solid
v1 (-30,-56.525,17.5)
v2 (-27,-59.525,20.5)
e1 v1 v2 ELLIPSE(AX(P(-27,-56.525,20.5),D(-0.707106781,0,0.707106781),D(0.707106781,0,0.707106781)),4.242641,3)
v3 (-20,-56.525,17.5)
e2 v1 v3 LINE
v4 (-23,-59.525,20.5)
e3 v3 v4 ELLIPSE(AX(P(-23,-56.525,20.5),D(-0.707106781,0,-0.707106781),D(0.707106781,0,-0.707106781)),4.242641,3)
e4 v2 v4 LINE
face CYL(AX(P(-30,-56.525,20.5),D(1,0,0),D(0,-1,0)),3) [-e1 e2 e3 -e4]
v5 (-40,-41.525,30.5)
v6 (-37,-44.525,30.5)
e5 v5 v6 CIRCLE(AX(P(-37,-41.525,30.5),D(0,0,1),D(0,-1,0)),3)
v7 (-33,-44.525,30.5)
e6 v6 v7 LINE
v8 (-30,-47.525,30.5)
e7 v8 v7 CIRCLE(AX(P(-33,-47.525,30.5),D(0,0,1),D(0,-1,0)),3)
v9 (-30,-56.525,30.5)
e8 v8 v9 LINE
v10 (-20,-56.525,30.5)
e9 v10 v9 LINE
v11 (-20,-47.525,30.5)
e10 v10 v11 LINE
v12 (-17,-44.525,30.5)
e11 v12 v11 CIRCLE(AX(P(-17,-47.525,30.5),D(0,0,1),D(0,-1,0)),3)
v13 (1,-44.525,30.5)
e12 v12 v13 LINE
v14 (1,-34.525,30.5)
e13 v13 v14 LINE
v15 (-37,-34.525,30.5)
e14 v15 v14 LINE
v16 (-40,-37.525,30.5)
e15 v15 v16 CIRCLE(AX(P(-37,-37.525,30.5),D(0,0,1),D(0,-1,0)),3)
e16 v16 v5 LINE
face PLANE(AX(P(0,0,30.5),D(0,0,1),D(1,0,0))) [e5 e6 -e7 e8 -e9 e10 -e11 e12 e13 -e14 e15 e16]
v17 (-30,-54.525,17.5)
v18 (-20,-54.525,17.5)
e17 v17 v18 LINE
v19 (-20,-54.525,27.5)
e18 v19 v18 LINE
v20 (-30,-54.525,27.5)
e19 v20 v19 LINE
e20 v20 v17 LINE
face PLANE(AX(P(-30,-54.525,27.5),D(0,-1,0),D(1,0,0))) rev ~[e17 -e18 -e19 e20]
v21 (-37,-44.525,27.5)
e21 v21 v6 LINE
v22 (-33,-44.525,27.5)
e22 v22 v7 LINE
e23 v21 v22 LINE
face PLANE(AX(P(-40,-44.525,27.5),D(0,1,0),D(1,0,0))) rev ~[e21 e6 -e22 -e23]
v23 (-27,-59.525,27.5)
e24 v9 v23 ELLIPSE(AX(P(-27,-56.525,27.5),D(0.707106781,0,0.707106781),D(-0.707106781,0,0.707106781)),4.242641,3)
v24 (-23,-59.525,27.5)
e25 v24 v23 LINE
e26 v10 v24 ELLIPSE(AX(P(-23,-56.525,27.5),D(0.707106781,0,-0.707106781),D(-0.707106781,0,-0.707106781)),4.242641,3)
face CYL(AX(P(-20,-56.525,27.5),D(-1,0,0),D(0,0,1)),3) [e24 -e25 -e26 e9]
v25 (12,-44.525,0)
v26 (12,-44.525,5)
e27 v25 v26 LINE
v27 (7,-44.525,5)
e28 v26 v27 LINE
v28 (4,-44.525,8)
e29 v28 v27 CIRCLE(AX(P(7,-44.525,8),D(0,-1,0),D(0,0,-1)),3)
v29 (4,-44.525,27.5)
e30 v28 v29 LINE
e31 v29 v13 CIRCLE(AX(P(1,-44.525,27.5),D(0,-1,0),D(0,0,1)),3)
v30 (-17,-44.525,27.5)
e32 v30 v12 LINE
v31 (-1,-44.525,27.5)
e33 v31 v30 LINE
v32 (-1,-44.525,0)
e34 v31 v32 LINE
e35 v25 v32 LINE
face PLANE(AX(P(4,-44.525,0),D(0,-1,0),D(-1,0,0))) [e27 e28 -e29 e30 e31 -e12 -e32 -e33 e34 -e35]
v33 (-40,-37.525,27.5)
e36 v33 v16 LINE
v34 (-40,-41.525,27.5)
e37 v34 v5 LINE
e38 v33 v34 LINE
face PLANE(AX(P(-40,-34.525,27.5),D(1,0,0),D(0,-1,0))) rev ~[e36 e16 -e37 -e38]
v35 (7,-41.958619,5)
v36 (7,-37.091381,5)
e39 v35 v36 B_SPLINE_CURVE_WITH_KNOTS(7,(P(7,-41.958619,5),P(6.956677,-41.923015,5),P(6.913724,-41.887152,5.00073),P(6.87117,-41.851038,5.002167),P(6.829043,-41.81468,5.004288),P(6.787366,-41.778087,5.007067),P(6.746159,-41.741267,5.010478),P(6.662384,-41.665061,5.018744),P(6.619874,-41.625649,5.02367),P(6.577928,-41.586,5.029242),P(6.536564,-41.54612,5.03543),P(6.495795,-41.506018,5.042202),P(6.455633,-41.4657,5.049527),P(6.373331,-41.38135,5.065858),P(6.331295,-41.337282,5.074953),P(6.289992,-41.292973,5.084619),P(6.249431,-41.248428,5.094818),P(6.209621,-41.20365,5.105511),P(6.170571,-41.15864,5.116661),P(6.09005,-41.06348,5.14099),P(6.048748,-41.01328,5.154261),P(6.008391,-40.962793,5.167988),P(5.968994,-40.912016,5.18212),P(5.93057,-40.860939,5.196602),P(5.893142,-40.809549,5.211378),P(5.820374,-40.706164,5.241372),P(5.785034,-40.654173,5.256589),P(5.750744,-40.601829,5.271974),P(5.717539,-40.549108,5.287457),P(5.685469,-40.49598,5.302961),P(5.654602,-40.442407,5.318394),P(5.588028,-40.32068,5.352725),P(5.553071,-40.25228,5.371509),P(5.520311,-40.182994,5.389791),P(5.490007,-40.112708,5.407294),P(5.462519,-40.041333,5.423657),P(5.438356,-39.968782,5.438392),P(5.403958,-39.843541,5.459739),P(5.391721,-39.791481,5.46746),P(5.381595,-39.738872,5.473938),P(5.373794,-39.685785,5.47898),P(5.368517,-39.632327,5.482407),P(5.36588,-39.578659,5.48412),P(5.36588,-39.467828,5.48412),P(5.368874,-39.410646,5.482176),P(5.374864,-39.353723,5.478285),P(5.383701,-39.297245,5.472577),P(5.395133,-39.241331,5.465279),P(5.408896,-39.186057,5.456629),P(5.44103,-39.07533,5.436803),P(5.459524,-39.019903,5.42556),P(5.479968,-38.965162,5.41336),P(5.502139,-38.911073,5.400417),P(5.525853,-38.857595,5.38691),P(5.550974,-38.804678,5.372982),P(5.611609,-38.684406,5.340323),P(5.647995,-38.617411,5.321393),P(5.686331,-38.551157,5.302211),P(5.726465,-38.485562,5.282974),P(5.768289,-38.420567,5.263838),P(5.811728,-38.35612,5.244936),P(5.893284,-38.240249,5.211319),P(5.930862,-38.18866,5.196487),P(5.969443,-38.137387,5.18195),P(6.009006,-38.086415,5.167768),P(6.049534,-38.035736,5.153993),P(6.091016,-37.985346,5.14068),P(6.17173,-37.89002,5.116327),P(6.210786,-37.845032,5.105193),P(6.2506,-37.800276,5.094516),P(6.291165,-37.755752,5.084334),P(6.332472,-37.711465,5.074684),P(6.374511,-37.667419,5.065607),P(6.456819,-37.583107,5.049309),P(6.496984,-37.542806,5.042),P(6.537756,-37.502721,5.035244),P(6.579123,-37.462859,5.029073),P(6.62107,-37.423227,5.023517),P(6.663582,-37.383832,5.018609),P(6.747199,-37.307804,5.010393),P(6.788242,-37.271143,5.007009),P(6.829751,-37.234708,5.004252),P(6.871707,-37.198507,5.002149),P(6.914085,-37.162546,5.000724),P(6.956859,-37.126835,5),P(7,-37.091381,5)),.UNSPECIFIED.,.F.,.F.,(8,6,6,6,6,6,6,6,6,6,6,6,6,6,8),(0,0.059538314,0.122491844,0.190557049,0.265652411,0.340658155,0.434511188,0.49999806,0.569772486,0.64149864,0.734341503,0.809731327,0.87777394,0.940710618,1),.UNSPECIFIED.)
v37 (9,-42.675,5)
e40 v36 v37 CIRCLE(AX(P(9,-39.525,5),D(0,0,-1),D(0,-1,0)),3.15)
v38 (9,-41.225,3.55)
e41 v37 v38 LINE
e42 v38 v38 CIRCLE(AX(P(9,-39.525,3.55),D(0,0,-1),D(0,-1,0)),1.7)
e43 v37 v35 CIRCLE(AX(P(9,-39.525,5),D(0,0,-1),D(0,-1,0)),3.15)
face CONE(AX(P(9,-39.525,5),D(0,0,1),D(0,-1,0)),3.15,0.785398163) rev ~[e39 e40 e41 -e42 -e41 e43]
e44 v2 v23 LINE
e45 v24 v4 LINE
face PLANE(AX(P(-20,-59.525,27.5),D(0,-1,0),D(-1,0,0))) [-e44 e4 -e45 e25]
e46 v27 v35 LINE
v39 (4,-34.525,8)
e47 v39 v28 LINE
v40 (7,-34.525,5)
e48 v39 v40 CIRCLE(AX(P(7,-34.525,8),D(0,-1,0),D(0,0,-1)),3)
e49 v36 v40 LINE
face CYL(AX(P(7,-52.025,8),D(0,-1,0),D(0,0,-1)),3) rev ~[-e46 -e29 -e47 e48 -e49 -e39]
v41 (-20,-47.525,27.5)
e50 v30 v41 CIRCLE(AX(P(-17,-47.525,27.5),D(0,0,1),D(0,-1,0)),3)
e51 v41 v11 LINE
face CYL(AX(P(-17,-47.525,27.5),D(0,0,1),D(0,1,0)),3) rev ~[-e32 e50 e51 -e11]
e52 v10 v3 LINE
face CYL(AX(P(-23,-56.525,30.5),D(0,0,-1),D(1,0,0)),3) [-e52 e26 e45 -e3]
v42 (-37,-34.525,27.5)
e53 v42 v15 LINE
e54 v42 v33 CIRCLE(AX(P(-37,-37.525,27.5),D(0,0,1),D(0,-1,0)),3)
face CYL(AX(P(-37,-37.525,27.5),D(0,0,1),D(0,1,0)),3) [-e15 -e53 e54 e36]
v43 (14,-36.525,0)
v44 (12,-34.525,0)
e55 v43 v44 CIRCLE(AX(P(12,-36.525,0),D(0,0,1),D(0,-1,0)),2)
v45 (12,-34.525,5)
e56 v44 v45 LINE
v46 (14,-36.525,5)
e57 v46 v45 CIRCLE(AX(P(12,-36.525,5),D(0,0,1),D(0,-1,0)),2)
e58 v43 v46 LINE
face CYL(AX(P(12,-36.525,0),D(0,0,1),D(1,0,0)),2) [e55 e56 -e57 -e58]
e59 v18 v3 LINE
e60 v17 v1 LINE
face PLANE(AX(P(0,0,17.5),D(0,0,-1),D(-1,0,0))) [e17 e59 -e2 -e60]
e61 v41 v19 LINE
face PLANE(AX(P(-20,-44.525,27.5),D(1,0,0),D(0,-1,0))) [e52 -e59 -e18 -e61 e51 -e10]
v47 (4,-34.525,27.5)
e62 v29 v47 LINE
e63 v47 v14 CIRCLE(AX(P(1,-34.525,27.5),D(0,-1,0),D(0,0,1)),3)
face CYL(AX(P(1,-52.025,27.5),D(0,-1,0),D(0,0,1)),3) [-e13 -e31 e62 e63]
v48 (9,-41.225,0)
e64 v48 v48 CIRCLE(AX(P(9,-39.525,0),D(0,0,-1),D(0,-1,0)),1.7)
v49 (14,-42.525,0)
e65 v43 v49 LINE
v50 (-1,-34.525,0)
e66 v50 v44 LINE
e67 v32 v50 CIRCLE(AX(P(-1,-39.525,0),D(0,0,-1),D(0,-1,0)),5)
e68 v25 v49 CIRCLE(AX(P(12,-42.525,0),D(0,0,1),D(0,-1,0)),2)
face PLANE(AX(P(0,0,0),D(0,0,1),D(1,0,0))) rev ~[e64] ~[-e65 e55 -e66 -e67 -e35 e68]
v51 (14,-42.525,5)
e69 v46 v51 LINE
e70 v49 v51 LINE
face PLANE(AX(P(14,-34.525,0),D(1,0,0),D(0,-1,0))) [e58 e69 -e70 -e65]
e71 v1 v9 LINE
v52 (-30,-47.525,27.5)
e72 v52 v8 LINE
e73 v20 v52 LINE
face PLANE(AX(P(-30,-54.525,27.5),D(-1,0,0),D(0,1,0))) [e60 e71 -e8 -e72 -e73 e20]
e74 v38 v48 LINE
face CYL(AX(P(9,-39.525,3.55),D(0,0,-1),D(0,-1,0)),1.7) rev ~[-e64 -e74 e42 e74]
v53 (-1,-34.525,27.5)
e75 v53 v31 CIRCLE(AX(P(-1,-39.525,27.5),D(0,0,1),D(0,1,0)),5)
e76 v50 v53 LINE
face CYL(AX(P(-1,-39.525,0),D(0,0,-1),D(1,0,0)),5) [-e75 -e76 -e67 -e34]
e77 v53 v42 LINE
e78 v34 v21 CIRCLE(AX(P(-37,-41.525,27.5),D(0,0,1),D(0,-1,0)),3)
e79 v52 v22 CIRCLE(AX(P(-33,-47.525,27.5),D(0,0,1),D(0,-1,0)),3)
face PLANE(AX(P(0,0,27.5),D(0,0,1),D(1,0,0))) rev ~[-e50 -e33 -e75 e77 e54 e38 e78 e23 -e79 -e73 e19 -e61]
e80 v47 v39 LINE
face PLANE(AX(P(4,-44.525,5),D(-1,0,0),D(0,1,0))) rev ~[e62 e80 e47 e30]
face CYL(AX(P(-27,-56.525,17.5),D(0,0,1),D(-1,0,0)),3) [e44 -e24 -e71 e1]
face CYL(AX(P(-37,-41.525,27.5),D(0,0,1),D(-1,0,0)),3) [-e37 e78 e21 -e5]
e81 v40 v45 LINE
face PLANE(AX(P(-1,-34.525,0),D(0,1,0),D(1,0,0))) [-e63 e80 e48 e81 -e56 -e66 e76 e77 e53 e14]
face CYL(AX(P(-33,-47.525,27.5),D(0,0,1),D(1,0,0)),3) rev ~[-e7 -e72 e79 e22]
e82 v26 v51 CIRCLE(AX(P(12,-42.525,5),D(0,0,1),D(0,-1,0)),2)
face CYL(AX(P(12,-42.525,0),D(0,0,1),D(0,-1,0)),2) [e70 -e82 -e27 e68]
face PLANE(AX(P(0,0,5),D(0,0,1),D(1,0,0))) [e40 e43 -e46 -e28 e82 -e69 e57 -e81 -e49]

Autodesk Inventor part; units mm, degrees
ref_plane "YZ Plane" through (0, 0, 0) normal (1, 0, 0) x (0, 1, 0)
ref_plane "XZ Plane" through (0, 0, 0) normal (0, 1, 0) x (-1, 0, 0)
ref_plane "РабПлоскость1" through (0, 0, 0) normal (0, 0, 1) x (1, 0, 0)
sketch "Эскиз1" plane through (0, 0, 0) normal (0, 0, 1) x (1, 0, 0)
  line L0 (-6, -50.525) -> (-6, 46.475) projected
  arc A0 (-10, -54.525) -> (-6, -50.525) centre (-10, -50.525) ccw projected
  line L1 (-36, -54.525) -> (-10, -54.525) projected
  arc A1 (-40, -50.525) -> (-36, -54.525) centre (-36, -50.525) ccw projected
  line L2 (-40, 46.475) -> (-40, -50.525) projected
  circle A2 centre (-1, -39.525) radius 5
  line L3 (5, 13.475) -> (5, 17.5589) projected
  line L4 (14, -44.525) -> (4, -44.525)
  line L5 (4, -44.525) -> (4, -34.525)
  line L6 (4, -34.525) -> (14, -34.525)
  line L7 (14, -34.525) -> (14, -44.525)
  line L8 (4, -44.525) -> (-1, -44.525)
  line L9 (-1, -44.525) -> (-1, -34.525)
  line L10 (-1, -34.525) -> (4, -34.525)
  line L11 (4, -34.525) -> (4, -44.525)
  point P0 (0, 0)
  dimension "d0" = 10
  dimension "d1" = 10
  dimension "d2" = 5
  dimension "d3" = 10
  dimension "d4" = 15
  dimension "d5" = 20
extrude "Выдавливание1" add sketch "Эскиз1" along normal blind 5
sketch "Эскиз2" plane through (0, 0, 5) normal (0, 0, 1) x (1, 0, 0)
  line L0 (-1, -44.525) -> (14, -44.525) projected
  line L1 (14, -44.525) -> (14, -34.525) projected
  line L2 (14, -34.525) -> (-1, -34.525) projected
  arc A0 (-1, -34.525) -> (-1, -44.525) centre (-1, -39.525) ccw projected
  circle A1 centre (-1, -39.525) radius 5
  line L3 (-1, -44.525) -> (4, -44.525)
  line L4 (4, -44.525) -> (4, -34.525)
  line L5 (4, -34.525) -> (-1, -34.525)
  line L6 (-1, -34.525) -> (-1, -44.525)
  point P0 (0, 0)
  point P1 (4, -44.525)
  dimension "d8" = 10
extrude "Выдавливание2" add sketch "Эскиз2" along normal blind 22.5 contours A1 L4 L0 | L6 A1 | A0 L6 | L2 L4 A1
sketch "Эскиз3" plane through (0, 0, 27.5) normal (0, 0, 1) x (1, 0, 0)
  line L0 (-1, -44.525) -> (4, -44.525) projected
  line L1 (4, -44.525) -> (4, -34.525) projected
  line L2 (4, -34.525) -> (-1, -34.525) projected
  arc A0 (-1, -34.525) -> (-1, -44.525) centre (-1, -39.525) ccw projected
  line L3 (4, -34.525) -> (-40, -34.525)
  line L4 (-40, -34.525) -> (-40, -44.525)
  line L5 (-40, -44.525) -> (4, -44.525)
  line L6 (4, -44.525) -> (4, -34.525)
  line L7 (-40, 46.475) -> (-40, -50.525) projected
  line L8 (-30, -34.525) -> (-20, -34.525)
  line L9 (-20, -34.525) -> (-20, -59.525)
  line L10 (-20, -59.525) -> (-30, -59.525)
  line L11 (-30, -59.525) -> (-30, -34.525)
  line L12 (-36, -54.525) -> (-10, -54.525) projected
  point P0 (0, 0)
  point P1 (-1, -34.525)
  point P2 (-20, -44.525)
  point P3 (-30, -44.525)
  dimension "d11" = 0
  dimension "d12" = 10
  dimension "d24" = 10
  dimension "d25" = 10
  dimension "d26" = 5
extrude "Выдавливание3" add sketch "Эскиз3" along normal blind 3
sketch "Эскиз4" plane through (0, 0, 5) normal (0, 0, 1) x (1, 0, 0)
  line L0 (4, -34.525) -> (4, -44.525) projected
  line L1 (4, -44.525) -> (14, -44.525) projected
  line L2 (14, -44.525) -> (14, -34.525) projected
  line L3 (14, -34.525) -> (4, -34.525) projected
  circle A0 centre (9, -39.525) radius 1.6899
  point P0 (0, 0)
hole "Отверстие1" at (9, -39.525, 5) direction (0, 0, -1) diameter 3.4 end through all countersink diameter 6.3 countersink angle 90 clearance for "Винт с потайной головкой ISO 2009/7046" size "M3" standard "ISO"
fillet "Сопряжение1" radius 2 2 edges at (14, -34.525, 2.5) (14, -44.525, 2.5)
fillet "Сопряжение2" radius 3 2 edges at (4, -39.525, 5) (4, -39.525, 30.5)
sketch "Эскиз5" plane through (0, 0, 27.5) normal (0, 0, -1) x (-1, 0, 0)
  line L0 (30, -59.525) -> (20, -59.525) projected
  line L1 (30, -44.525) -> (30, -59.525) projected
  line L2 (20, -59.525) -> (30, -59.525)
  line L3 (30, -59.525) -> (30, -54.525)
  line L4 (30, -54.525) -> (20, -54.525)
  line L5 (20, -54.525) -> (20, -59.525)
  point P0 (0, 0)
  dimension "d27" = 5
extrude "Выдавливание4" add sketch "Эскиз5" along normal blind 10
fillet "Сопряжение3" radius 3 8 edges at (-20, -44.525, 29) (-30, -44.525, 29) (-40, -44.525, 29) (-40, -34.525, 29) (-20, -59.525, 24) (-30, -59.525, 24) (-25, -59.525, 30.5) (-25, -59.525, 17.5)
properties part number "FrontBracket" material "Пластик ПАЭК"
